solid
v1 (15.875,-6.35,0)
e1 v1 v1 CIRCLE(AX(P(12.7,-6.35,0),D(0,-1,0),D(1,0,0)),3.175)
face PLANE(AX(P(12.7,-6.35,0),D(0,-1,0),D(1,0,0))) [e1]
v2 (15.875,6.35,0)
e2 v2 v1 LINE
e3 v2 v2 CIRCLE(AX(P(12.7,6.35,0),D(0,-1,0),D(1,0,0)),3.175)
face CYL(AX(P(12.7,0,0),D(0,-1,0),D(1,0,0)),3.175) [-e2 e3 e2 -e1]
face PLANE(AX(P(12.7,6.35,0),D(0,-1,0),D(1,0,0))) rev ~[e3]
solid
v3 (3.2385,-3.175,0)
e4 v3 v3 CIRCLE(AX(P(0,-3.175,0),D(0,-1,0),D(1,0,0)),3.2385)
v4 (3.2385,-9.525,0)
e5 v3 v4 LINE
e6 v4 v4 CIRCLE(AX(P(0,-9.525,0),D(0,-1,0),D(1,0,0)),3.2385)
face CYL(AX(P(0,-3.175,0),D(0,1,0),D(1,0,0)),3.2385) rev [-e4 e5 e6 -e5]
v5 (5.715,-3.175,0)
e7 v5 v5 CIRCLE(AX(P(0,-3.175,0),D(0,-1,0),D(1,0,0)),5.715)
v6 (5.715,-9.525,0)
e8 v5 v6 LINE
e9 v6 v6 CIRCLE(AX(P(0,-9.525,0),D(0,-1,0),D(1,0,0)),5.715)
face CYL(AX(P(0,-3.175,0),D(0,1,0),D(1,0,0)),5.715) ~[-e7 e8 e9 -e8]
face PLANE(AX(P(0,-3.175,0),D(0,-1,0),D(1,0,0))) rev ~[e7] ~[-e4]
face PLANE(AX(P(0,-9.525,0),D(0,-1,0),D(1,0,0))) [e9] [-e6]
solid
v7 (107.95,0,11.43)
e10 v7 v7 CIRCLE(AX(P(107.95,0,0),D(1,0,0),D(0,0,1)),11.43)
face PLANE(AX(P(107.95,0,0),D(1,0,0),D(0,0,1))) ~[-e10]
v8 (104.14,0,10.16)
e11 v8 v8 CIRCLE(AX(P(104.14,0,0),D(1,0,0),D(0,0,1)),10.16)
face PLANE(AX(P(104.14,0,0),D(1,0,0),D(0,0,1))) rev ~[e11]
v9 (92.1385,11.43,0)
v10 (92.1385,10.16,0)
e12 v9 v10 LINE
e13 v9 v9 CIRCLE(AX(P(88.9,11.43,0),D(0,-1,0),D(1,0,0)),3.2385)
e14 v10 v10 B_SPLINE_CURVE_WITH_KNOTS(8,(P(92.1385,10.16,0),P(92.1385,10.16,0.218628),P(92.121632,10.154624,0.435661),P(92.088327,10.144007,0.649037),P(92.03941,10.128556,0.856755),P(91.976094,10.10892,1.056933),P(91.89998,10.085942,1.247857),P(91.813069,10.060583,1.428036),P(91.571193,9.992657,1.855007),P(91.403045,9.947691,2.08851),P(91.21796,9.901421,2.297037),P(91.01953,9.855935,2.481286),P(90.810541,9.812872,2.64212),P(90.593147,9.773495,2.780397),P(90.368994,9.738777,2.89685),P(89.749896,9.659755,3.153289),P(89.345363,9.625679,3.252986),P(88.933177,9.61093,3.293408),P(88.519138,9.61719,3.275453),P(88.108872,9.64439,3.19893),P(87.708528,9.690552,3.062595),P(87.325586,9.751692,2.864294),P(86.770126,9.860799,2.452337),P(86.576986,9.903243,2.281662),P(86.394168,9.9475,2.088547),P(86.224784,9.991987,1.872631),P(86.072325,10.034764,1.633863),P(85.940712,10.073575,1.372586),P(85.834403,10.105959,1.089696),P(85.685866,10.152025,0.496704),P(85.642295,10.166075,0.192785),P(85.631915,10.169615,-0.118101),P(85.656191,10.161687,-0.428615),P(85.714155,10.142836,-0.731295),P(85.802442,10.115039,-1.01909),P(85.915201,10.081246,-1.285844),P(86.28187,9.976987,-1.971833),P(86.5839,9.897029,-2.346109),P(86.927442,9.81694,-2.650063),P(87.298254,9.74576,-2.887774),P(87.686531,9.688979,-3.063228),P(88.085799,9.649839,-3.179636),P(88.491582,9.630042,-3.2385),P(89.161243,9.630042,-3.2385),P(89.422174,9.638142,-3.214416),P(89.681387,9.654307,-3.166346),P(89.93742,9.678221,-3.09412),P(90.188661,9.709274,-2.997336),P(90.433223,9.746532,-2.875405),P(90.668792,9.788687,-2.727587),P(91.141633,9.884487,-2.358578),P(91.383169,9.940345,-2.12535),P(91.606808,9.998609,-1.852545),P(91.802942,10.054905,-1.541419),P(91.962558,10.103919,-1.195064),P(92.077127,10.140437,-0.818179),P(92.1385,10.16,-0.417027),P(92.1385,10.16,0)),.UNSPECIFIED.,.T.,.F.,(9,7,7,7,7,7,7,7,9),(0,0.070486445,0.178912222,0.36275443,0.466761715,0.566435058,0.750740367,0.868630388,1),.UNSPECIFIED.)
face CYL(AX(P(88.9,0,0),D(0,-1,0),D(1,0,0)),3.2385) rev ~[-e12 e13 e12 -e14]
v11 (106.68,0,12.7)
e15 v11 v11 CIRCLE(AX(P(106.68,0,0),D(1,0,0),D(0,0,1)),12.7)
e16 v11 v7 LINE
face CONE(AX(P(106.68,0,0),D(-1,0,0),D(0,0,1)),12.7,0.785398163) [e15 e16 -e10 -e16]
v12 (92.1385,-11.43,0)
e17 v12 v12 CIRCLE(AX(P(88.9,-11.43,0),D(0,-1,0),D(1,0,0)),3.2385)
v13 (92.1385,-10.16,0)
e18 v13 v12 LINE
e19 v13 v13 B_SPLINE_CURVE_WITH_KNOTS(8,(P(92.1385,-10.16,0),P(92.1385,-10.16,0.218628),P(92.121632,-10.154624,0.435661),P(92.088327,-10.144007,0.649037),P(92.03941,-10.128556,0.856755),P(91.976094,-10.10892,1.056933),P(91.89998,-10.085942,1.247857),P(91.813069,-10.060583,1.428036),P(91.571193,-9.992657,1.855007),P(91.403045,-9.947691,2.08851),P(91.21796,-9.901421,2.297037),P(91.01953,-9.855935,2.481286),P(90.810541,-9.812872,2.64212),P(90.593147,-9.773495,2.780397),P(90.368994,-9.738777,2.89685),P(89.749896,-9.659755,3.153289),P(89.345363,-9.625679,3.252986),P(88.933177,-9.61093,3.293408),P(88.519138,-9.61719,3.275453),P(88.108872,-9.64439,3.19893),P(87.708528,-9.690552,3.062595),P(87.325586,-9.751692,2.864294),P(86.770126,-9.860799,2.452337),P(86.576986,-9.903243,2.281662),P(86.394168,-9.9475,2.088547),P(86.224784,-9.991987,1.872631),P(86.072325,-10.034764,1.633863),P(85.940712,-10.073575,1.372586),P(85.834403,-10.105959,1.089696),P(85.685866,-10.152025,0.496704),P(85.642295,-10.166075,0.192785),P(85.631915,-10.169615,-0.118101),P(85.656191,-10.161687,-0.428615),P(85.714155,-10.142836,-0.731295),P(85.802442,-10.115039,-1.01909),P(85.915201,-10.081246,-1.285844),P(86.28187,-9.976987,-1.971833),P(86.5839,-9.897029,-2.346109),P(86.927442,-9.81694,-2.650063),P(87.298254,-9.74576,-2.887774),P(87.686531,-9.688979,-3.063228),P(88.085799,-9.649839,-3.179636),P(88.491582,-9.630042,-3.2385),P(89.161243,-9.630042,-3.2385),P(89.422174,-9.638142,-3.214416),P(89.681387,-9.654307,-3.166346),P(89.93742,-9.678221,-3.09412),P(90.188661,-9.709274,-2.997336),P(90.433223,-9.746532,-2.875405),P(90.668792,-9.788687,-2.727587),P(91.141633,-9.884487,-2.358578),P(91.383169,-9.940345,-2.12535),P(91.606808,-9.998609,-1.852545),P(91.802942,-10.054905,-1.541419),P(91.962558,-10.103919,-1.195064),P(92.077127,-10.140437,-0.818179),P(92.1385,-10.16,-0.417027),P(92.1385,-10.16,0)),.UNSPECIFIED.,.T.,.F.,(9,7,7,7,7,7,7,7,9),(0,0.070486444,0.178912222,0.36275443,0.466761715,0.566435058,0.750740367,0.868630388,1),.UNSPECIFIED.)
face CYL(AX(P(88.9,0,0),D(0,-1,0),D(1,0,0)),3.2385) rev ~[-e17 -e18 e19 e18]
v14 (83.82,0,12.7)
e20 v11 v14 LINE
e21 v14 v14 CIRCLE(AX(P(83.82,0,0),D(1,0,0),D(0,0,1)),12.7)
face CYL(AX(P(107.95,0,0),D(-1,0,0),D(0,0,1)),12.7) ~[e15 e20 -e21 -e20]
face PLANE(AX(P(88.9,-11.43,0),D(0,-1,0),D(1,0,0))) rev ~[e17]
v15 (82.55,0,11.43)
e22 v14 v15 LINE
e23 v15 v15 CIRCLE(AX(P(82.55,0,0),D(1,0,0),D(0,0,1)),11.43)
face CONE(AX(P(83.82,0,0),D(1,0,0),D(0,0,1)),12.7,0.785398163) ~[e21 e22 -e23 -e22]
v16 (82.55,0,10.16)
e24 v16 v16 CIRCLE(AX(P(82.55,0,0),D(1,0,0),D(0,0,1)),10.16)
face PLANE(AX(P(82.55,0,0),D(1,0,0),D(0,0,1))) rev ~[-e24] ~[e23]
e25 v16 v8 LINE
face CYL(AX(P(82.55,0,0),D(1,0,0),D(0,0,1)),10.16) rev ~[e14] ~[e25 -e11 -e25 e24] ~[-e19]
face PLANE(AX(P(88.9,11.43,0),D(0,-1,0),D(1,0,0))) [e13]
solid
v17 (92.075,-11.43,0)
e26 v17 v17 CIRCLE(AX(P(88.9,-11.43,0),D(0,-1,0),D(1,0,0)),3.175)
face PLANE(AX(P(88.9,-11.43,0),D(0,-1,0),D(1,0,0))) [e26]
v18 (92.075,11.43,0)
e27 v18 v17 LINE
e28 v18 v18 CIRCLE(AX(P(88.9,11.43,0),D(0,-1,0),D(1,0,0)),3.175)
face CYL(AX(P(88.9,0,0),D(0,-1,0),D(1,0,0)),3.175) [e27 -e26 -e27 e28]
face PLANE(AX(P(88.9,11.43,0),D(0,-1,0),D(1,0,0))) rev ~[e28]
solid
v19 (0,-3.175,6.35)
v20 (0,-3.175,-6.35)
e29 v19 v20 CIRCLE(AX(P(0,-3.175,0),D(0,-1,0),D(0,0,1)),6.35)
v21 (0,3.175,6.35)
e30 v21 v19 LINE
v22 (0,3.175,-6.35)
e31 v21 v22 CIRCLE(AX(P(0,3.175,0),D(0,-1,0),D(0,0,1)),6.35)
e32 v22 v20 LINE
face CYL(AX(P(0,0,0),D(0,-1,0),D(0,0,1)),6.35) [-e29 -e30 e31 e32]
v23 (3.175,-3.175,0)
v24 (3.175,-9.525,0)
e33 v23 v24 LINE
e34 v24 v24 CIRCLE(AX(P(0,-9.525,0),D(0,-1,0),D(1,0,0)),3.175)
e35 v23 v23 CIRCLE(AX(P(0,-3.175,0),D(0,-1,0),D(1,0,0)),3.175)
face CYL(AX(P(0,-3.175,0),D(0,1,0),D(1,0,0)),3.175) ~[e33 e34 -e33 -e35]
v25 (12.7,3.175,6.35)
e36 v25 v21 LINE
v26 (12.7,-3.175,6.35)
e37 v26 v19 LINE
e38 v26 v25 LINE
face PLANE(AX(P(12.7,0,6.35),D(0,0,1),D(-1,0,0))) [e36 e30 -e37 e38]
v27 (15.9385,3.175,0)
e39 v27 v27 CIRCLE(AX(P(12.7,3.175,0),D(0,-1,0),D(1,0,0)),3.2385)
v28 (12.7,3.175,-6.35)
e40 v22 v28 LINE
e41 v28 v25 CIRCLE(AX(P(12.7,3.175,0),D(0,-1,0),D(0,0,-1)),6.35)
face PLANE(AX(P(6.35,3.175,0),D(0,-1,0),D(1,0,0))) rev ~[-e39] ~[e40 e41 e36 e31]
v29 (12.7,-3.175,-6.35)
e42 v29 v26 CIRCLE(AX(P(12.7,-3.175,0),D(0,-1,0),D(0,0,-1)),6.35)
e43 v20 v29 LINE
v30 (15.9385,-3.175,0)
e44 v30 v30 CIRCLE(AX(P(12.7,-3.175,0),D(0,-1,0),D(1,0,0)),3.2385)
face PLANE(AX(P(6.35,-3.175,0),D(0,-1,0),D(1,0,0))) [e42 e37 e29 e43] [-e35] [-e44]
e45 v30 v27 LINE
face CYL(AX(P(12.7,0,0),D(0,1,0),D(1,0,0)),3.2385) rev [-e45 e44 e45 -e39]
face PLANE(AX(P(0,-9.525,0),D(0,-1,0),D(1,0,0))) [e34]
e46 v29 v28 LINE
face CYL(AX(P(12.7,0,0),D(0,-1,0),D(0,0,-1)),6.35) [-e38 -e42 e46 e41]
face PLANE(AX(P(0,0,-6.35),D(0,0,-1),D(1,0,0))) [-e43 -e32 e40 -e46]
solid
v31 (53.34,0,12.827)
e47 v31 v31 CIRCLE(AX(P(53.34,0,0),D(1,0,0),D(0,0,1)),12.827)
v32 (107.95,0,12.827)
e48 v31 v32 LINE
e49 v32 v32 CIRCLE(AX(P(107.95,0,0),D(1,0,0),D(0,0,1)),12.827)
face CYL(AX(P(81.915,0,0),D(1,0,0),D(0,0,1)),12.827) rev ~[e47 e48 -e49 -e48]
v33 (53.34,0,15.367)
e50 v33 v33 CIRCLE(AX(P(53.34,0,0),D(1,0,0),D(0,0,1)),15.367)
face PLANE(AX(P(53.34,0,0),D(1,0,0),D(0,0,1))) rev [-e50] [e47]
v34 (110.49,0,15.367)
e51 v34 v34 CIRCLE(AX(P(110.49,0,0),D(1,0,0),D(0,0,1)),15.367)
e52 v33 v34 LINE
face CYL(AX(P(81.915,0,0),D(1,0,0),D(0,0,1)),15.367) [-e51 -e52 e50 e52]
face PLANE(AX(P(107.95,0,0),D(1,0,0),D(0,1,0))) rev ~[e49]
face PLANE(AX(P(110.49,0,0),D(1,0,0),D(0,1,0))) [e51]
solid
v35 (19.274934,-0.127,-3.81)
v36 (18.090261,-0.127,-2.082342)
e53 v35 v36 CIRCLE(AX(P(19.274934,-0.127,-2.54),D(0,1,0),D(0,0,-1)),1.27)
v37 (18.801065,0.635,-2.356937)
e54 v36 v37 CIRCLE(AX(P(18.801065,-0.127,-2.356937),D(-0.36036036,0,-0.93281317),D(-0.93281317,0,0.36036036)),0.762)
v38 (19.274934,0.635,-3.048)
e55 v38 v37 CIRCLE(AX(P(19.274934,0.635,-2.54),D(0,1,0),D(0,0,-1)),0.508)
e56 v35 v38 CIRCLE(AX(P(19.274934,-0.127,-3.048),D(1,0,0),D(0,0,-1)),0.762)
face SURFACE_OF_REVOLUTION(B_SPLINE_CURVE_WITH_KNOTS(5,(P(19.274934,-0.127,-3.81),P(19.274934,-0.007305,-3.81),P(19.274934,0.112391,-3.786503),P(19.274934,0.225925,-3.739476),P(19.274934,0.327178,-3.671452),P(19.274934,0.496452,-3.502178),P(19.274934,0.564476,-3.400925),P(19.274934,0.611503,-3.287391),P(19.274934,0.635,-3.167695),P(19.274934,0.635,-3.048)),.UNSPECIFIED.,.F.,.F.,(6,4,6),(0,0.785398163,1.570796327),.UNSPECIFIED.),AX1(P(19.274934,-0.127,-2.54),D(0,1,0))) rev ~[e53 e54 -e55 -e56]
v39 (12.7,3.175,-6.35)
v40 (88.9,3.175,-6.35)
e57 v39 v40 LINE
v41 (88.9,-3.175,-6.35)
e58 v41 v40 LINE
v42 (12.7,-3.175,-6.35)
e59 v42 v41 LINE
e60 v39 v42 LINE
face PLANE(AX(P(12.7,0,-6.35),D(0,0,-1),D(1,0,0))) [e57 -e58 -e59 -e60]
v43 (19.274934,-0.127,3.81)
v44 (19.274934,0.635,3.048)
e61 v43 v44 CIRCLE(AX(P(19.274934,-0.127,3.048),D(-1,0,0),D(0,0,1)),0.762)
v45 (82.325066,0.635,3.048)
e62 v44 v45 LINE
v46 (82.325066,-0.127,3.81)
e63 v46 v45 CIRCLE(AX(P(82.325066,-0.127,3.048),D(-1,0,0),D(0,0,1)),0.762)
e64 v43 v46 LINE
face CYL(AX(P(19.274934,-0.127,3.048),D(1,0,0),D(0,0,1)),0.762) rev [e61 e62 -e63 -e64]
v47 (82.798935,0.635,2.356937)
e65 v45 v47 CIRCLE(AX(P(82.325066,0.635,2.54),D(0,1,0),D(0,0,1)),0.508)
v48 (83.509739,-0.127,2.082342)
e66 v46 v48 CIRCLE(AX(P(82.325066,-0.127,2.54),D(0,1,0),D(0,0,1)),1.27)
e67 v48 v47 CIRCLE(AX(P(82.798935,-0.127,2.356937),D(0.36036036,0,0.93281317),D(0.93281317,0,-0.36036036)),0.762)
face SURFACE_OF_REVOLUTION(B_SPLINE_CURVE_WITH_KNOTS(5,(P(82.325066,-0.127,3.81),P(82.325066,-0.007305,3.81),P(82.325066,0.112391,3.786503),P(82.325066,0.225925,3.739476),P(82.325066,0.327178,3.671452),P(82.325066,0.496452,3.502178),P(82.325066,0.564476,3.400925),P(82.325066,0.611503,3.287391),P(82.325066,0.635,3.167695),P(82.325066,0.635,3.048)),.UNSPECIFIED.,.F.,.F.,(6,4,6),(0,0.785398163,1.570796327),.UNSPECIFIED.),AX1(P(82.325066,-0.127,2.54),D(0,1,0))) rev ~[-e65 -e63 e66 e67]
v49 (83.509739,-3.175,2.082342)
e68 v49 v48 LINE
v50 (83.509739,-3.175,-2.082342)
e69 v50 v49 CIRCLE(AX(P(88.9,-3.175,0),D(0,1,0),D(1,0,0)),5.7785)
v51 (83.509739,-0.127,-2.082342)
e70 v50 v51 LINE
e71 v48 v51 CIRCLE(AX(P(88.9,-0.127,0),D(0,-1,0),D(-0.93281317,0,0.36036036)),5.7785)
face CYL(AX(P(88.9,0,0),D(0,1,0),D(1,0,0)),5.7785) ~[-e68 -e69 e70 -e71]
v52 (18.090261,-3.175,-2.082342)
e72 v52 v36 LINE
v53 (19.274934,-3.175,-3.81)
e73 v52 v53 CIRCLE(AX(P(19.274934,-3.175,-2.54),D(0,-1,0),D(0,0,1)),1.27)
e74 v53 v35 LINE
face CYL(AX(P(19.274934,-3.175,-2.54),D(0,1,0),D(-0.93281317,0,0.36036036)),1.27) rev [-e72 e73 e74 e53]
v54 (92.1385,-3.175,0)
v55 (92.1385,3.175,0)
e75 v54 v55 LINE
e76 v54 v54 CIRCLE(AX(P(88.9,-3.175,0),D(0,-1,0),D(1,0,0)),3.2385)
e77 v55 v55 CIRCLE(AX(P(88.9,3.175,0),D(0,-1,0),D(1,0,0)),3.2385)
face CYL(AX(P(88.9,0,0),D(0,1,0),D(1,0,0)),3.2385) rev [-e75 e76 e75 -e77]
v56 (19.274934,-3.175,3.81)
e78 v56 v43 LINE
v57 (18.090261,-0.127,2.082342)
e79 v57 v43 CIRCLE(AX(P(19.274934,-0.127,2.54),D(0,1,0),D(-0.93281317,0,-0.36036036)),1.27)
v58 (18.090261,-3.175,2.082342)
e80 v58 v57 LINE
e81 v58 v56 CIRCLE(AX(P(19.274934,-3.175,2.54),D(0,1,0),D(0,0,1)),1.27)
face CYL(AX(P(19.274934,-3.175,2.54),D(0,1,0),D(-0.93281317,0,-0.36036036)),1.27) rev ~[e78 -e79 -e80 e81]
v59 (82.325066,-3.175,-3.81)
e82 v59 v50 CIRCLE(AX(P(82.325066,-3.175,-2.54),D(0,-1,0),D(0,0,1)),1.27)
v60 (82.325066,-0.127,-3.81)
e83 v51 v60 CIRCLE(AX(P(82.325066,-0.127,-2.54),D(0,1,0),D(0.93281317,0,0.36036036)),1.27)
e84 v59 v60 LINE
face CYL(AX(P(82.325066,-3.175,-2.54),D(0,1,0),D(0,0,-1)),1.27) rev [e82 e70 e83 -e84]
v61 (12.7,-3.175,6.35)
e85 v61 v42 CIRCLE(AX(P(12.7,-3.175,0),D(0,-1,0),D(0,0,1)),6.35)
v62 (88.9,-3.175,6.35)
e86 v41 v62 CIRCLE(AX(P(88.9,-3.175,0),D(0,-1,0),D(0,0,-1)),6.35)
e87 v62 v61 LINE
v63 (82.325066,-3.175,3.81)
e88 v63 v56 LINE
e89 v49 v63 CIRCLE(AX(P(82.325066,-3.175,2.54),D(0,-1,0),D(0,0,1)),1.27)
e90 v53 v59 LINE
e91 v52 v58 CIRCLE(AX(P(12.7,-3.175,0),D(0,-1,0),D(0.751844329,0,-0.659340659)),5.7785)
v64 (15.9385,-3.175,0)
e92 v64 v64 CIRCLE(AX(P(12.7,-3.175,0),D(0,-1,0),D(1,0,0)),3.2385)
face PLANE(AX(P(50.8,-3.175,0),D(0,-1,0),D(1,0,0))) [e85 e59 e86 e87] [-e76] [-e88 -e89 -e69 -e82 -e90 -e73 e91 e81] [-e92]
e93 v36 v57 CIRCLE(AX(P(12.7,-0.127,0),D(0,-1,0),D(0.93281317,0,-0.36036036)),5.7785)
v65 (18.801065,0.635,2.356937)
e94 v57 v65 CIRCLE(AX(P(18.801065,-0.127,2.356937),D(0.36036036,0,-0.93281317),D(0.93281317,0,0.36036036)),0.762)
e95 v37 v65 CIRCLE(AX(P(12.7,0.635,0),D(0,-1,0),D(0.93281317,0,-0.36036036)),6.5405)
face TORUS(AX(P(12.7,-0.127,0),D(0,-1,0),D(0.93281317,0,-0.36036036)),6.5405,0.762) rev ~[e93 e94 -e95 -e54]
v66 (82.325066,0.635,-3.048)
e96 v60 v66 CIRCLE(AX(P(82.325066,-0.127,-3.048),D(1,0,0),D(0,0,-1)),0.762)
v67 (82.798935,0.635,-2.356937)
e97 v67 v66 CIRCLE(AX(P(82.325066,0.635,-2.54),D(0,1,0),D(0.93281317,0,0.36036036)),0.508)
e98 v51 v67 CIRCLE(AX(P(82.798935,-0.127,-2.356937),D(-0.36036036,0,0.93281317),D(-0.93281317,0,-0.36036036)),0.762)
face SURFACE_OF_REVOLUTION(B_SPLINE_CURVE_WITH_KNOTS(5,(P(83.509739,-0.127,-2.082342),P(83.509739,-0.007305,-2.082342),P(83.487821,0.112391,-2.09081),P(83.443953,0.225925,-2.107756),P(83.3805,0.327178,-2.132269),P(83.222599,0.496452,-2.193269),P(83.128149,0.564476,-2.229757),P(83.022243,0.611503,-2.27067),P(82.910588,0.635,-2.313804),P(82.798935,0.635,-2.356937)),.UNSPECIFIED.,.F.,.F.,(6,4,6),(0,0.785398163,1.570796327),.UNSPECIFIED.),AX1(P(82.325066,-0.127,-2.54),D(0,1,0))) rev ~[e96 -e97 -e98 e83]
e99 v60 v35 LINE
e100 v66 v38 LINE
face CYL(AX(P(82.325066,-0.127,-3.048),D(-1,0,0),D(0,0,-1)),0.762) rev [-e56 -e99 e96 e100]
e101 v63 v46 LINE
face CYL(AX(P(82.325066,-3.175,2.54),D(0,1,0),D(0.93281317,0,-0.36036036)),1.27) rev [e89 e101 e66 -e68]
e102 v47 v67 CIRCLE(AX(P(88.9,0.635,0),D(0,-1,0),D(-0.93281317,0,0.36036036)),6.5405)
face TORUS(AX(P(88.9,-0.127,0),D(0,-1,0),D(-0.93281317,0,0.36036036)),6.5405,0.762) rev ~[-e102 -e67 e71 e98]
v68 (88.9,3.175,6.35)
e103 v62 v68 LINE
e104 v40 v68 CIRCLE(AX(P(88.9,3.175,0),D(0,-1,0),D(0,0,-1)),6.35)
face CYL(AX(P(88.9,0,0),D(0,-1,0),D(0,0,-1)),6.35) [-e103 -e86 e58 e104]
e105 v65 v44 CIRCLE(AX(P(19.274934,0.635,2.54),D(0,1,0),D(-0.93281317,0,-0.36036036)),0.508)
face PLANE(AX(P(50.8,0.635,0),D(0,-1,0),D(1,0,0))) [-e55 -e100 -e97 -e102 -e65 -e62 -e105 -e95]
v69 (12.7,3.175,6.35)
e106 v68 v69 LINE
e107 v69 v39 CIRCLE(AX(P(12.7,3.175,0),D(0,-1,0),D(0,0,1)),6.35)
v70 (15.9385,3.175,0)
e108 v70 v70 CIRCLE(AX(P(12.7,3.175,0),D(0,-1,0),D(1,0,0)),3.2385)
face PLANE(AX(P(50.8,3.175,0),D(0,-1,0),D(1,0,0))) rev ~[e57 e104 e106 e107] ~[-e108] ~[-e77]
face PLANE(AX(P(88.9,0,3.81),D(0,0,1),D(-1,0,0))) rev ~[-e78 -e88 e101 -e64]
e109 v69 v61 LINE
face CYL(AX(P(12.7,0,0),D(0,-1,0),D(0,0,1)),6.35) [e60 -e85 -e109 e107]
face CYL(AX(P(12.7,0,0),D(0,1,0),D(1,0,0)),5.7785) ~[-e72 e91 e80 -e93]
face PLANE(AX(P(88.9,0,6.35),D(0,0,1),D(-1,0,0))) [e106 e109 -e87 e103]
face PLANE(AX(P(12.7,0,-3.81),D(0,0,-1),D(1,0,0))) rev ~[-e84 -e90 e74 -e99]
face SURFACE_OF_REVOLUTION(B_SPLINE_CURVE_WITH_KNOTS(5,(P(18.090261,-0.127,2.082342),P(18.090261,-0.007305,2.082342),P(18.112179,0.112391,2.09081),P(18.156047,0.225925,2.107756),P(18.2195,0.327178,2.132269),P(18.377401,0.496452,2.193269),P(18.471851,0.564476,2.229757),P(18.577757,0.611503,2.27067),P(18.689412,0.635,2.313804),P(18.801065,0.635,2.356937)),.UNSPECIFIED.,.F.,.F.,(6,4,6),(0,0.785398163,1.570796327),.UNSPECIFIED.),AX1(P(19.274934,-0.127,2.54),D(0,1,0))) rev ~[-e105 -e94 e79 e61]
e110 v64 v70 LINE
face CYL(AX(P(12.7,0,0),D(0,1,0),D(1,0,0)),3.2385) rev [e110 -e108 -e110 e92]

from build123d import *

# Parameters (mm, degrees)
F4_W      = 57.15
F4_H      = 2.54
F3_R      = 3.175
F6_DEPTH  = 6.35
F0_R      = 3.2385
F7_DEPTH  = 3.175
F1_R      = 3.2385
F24_DEPTH = 3.175
F9_R      = 3.2385
F10_DEPTH = 11.43
F12_R     = 3.175
F13_DEPTH = 11.43
F14_SIZE  = 1.27
F15_T     = -2.54
F16_R     = 1.27
F17_R     = 0.762
F18_R     = 3.175
F19_DEPTH = 6.35
F20_R     = 5.715
F20_R_2   = 3.2385
F21_DEPTH = 6.35
F22_R     = 12.827
F23_DEPTH = 2.54


with BuildPart() as f5:
    # F4 (on Front) → F5 (revolve)
    with BuildSketch(Plane.XZ):
        with Locations((81.915, 14.097)):
            Rectangle(F4_W, F4_H)
    revolve(axis=Axis((44.45, 0, 0), (1, 0, 0)))

    # F22 (on face) → F23 (join)
    with BuildSketch(Plane.YZ.offset(110.49)):
        Circle(F22_R)
    extrude(amount=-F23_DEPTH)


with BuildPart() as f6:
    # F3 (on Front) → F6 (new body, symmetric)
    with BuildSketch(Plane.XZ):
        with Locations((12.7, 0)):
            Circle(F3_R)
    extrude(amount=F6_DEPTH, both=True)


with BuildPart() as f7:
    # F0 (on Front) → F7 (new body, symmetric)
    with BuildSketch(Plane.XZ):
        with BuildLine():
            Line((12.7, 6.35), (0, 6.35))
            ThreePointArc((0, 6.35), (-6.35, 0), (0, -6.35))
            Line((0, -6.35), (12.7, -6.35))
            ThreePointArc((12.7, -6.35), (19.05, 0), (12.7, 6.35))
        make_face()
        with Locations((12.7, 0)):
            Circle(F0_R, mode=Mode.SUBTRACT)
    extrude(amount=F7_DEPTH, both=True)

    # F18 (on face) → F19 (join)
    with BuildSketch(Plane.XZ.offset(3.175)):
        Circle(F18_R)
    extrude(amount=F19_DEPTH)


with BuildPart() as f24:
    # F1 (on Front) → F24 (new body, symmetric)
    with BuildSketch(Plane.XZ):
        with BuildLine():
            Line((88.9, 6.35), (12.7, 6.35))
            ThreePointArc((12.7, 6.35), (6.35, 0), (12.7, -6.35))
            Line((12.7, -6.35), (88.9, -6.35))
            ThreePointArc((88.9, -6.35), (95.25, 0), (88.9, 6.35))
        make_face()
        with Locations((12.7, 0)):
            Circle(F1_R, mode=Mode.SUBTRACT)
        with Locations((88.9, 0)):
            Circle(F1_R, mode=Mode.SUBTRACT)
    extrude(amount=F24_DEPTH, both=True)

    # F15
    f15_openings = [f24.faces().sort_by_distance(p)[0] for p in [
        (50.8, -3.175, 0),
    ]]
    offset(amount=F15_T, openings=f15_openings, kind=Kind.INTERSECTION)

    # F16
    f16_edges = [f24.edges().sort_by_distance(p)[0] for p in [
        (84.555468, -1.27, -3.81),
        (17.044532, -1.27, -3.81),
        (84.555468, -1.27, 3.81),
        (17.044532, -1.27, 3.81),
    ]]
    fillet(f16_edges, radius=F16_R)

    # F17
    f17_edges = [f24.edges().sort_by_distance(p)[0] for p in [
        (50.8, 0.635, -3.81),
        (83.372474, 0.635, -3.258218),
        (18.227526, 0.635, -3.258218),
        (83.1215, 0.635, 0),
        (18.380611, 0.635, -1.059113),
        (83.372474, 0.635, 3.258218),
        (18.380611, 0.635, 1.059113),
        (50.8, 0.635, 3.81),
        (18.227526, 0.635, 3.258218),
    ]]
    fillet(f17_edges, radius=F17_R)


with BuildPart() as f8:
    # F2 (on Front) → F8 (revolve)
    with BuildSketch(Plane.XZ):
        Polygon((107.95, 12.7), (82.55, 12.7), (82.55, 10.16), (104.14, 10.16), (104.14, 0), (107.95, 0), align=None)
    revolve(axis=Axis((44.45, 0, 0), (1, 0, 0)))


with BuildPart() as f10:
    # F9 (on Front) → F10 (new body, symmetric)
    with BuildSketch(Plane.XZ):
        with Locations((88.9, 0)):
            Circle(F9_R)
    extrude(amount=F10_DEPTH, both=True)


with BuildPart() as f8_1:
    add(f8.part)

    # F11: cut F10
    add(f10.part, mode=Mode.SUBTRACT)

    # F14
    f14_edges = [f8_1.edges().sort_by_distance(p)[0] for p in [
        (107.95, 0, -12.7),
        (82.55, 0, -12.7),
    ]]
    chamfer(f14_edges, length=F14_SIZE)


with BuildPart() as f13:
    # F12 (on Front) → F13 (new body, symmetric)
    with BuildSketch(Plane.XZ):
        with Locations((88.9, 0)):
            Circle(F12_R)
    extrude(amount=F13_DEPTH, both=True)


with BuildPart() as f21:
    # F20 (on face) → F21 (new body)
    with BuildSketch(Plane.XZ.offset(3.175)):
        Circle(F20_R)
        Circle(F20_R_2, mode=Mode.SUBTRACT)
    extrude(amount=F21_DEPTH)


solid = Compound([f5.part, f6.part, f7.part, f24.part, f8_1.part, f13.part, f21.part])
